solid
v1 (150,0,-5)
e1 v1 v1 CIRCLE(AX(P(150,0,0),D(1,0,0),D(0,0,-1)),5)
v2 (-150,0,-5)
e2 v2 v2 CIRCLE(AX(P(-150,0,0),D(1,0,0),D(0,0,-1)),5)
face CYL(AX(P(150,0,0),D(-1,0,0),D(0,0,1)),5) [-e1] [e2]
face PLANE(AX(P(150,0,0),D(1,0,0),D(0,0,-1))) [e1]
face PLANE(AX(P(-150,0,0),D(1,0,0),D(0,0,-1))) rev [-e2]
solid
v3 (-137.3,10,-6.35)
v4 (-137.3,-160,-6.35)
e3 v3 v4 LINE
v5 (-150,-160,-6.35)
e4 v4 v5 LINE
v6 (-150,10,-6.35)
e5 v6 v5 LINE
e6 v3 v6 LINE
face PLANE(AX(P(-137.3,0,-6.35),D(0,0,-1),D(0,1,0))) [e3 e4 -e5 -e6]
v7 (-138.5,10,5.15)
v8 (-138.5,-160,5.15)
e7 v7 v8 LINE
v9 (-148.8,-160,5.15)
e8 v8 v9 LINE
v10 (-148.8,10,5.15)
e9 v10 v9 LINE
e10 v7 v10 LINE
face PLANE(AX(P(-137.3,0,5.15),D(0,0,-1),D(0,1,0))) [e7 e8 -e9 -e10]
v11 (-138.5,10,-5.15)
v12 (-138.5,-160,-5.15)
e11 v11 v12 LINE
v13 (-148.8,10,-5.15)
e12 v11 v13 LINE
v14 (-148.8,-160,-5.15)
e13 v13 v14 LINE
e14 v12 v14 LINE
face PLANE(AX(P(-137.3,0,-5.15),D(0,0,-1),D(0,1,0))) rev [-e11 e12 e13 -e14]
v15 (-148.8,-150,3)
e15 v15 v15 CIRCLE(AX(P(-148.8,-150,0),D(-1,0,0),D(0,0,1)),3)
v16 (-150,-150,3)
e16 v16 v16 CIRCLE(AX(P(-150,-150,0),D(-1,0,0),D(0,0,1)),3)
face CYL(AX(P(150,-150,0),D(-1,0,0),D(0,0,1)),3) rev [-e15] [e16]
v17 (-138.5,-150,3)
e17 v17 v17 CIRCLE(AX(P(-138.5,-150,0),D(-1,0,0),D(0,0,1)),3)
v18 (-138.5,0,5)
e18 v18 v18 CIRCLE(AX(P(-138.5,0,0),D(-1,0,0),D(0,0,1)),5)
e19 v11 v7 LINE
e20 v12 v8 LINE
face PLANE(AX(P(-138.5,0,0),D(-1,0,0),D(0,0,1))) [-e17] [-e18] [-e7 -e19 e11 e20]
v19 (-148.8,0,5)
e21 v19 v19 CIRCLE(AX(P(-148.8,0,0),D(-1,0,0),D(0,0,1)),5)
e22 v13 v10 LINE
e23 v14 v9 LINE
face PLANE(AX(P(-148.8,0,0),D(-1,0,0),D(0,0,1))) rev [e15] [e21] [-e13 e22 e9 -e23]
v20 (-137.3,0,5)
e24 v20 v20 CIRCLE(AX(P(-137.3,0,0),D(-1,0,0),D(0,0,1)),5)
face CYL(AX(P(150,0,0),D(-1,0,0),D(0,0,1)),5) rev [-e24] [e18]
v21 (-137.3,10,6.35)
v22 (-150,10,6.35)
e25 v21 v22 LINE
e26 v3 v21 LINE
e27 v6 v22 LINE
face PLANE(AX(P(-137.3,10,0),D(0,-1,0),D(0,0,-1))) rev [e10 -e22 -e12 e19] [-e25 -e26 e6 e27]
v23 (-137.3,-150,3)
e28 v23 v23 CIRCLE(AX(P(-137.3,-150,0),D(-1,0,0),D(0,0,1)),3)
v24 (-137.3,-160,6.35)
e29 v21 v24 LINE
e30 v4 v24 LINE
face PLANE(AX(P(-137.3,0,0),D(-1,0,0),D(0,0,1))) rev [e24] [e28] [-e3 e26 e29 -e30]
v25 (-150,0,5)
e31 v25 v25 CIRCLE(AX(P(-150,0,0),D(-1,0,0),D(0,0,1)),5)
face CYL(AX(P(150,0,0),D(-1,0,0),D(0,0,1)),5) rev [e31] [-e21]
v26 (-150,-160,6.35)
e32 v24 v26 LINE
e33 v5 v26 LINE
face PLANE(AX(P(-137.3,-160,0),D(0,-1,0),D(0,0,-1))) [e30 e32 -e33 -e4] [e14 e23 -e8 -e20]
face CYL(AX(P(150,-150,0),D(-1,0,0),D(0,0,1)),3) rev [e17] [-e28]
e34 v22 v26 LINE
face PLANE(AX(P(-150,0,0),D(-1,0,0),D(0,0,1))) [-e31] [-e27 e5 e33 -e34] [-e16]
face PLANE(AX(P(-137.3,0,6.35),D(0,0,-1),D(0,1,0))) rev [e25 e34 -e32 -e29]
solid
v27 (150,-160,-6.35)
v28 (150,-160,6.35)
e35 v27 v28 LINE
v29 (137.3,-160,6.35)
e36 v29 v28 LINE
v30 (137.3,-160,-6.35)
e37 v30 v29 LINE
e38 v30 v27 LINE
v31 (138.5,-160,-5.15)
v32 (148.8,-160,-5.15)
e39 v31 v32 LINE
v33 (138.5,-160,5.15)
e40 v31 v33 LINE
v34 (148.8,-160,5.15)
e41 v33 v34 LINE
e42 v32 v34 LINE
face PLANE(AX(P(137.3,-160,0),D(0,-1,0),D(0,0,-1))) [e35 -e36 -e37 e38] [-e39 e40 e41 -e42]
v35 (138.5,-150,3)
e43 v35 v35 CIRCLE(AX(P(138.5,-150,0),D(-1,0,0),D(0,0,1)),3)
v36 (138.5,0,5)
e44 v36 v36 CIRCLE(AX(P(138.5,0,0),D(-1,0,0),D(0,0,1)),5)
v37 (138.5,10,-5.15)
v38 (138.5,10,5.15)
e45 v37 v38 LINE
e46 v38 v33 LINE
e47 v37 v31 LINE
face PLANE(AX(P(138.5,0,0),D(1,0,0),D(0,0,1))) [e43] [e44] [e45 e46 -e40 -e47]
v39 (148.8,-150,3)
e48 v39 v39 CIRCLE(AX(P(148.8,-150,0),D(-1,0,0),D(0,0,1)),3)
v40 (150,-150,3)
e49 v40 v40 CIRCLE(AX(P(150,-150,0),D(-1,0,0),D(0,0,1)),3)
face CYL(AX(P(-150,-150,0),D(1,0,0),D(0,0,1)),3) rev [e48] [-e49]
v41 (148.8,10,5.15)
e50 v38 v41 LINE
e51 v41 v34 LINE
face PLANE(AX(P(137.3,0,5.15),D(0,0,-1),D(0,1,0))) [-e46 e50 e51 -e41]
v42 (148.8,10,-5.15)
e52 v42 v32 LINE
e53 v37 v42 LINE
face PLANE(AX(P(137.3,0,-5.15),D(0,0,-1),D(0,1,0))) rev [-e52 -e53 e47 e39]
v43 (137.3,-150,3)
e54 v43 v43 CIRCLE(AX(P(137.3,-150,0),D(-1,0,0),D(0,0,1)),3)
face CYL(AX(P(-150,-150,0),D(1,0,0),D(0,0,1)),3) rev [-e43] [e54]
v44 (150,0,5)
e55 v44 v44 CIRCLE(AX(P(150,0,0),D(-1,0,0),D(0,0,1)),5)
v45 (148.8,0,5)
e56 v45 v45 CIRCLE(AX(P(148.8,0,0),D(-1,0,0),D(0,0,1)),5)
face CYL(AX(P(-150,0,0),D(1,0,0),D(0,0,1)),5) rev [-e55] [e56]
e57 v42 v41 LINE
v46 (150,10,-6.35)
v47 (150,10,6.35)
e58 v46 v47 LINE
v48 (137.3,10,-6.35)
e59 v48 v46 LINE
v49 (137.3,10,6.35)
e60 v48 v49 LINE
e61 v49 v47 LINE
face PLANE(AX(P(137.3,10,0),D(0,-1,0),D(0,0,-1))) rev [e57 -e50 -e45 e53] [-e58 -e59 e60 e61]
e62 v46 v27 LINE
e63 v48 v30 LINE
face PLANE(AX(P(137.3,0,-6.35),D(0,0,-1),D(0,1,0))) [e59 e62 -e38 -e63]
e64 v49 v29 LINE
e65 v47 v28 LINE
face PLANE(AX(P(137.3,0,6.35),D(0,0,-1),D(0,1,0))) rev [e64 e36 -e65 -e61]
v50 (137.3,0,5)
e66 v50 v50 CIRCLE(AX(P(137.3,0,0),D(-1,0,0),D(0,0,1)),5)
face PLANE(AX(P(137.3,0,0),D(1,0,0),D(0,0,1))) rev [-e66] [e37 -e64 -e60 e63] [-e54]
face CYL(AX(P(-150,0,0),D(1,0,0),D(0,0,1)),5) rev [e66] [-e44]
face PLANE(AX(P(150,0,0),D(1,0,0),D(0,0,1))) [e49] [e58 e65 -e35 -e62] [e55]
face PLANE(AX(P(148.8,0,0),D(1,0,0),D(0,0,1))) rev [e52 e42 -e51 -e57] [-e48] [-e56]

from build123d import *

# Parameters (mm, degrees)
SKETCH1_R           = 5
BOSS_EXTRUDE1_DEPTH = 150
SKETCH2_W           = 12.7
SKETCH2_H           = 170
BOSS_EXTRUDE2_DEPTH = 12.7
SHELL1_T            = -1.2
SKETCH2_3_R         = 3
SKETCH2_3_R_2       = 5
CUT_EXTRUDE1_DEPTH  = 341.059292624


with BuildPart() as part:
    # Sketch1 → Boss-Extrude1 (new, symmetric)
    with BuildSketch(Plane(origin=(0, 0, 0), x_dir=(0, 0, -1), z_dir=(1, 0, 0))):
        Circle(SKETCH1_R)
    extrude(amount=BOSS_EXTRUDE1_DEPTH, both=True)


with BuildPart() as body_2:
    # Sketch2 → Boss-Extrude2 (new body)
    with BuildSketch(Plane.ZY.offset(150)):
        with Locations((0, -75)):
            Rectangle(SKETCH2_W, SKETCH2_H)
    extrude(amount=-BOSS_EXTRUDE2_DEPTH)

    # Shell1
    shell1_openings = [body_2.faces().sort_by_distance(p)[0] for p in [
        (-143.65, 10, 0),
        (-143.65, -160, 0),
    ]]
    offset(amount=SHELL1_T, openings=shell1_openings, kind=Kind.INTERSECTION)

    # Sketch2<3> → Cut-Extrude1 (cut, through all)
    with BuildSketch(Plane.ZY.offset(150)):
        with Locations((0, -150)):
            Circle(SKETCH2_3_R)
        Circle(SKETCH2_3_R_2)
    extrude(amount=-CUT_EXTRUDE1_DEPTH, mode=Mode.SUBTRACT)


with BuildPart() as body_3:
    # Mirror1: mirrored copy
    add(body_2.part.mirror(Plane(origin=(0, 0, 0), x_dir=(0, 0, 1), z_dir=(1, 0, 0))))


solid = Compound([part.part, body_2.part, body_3.part])
